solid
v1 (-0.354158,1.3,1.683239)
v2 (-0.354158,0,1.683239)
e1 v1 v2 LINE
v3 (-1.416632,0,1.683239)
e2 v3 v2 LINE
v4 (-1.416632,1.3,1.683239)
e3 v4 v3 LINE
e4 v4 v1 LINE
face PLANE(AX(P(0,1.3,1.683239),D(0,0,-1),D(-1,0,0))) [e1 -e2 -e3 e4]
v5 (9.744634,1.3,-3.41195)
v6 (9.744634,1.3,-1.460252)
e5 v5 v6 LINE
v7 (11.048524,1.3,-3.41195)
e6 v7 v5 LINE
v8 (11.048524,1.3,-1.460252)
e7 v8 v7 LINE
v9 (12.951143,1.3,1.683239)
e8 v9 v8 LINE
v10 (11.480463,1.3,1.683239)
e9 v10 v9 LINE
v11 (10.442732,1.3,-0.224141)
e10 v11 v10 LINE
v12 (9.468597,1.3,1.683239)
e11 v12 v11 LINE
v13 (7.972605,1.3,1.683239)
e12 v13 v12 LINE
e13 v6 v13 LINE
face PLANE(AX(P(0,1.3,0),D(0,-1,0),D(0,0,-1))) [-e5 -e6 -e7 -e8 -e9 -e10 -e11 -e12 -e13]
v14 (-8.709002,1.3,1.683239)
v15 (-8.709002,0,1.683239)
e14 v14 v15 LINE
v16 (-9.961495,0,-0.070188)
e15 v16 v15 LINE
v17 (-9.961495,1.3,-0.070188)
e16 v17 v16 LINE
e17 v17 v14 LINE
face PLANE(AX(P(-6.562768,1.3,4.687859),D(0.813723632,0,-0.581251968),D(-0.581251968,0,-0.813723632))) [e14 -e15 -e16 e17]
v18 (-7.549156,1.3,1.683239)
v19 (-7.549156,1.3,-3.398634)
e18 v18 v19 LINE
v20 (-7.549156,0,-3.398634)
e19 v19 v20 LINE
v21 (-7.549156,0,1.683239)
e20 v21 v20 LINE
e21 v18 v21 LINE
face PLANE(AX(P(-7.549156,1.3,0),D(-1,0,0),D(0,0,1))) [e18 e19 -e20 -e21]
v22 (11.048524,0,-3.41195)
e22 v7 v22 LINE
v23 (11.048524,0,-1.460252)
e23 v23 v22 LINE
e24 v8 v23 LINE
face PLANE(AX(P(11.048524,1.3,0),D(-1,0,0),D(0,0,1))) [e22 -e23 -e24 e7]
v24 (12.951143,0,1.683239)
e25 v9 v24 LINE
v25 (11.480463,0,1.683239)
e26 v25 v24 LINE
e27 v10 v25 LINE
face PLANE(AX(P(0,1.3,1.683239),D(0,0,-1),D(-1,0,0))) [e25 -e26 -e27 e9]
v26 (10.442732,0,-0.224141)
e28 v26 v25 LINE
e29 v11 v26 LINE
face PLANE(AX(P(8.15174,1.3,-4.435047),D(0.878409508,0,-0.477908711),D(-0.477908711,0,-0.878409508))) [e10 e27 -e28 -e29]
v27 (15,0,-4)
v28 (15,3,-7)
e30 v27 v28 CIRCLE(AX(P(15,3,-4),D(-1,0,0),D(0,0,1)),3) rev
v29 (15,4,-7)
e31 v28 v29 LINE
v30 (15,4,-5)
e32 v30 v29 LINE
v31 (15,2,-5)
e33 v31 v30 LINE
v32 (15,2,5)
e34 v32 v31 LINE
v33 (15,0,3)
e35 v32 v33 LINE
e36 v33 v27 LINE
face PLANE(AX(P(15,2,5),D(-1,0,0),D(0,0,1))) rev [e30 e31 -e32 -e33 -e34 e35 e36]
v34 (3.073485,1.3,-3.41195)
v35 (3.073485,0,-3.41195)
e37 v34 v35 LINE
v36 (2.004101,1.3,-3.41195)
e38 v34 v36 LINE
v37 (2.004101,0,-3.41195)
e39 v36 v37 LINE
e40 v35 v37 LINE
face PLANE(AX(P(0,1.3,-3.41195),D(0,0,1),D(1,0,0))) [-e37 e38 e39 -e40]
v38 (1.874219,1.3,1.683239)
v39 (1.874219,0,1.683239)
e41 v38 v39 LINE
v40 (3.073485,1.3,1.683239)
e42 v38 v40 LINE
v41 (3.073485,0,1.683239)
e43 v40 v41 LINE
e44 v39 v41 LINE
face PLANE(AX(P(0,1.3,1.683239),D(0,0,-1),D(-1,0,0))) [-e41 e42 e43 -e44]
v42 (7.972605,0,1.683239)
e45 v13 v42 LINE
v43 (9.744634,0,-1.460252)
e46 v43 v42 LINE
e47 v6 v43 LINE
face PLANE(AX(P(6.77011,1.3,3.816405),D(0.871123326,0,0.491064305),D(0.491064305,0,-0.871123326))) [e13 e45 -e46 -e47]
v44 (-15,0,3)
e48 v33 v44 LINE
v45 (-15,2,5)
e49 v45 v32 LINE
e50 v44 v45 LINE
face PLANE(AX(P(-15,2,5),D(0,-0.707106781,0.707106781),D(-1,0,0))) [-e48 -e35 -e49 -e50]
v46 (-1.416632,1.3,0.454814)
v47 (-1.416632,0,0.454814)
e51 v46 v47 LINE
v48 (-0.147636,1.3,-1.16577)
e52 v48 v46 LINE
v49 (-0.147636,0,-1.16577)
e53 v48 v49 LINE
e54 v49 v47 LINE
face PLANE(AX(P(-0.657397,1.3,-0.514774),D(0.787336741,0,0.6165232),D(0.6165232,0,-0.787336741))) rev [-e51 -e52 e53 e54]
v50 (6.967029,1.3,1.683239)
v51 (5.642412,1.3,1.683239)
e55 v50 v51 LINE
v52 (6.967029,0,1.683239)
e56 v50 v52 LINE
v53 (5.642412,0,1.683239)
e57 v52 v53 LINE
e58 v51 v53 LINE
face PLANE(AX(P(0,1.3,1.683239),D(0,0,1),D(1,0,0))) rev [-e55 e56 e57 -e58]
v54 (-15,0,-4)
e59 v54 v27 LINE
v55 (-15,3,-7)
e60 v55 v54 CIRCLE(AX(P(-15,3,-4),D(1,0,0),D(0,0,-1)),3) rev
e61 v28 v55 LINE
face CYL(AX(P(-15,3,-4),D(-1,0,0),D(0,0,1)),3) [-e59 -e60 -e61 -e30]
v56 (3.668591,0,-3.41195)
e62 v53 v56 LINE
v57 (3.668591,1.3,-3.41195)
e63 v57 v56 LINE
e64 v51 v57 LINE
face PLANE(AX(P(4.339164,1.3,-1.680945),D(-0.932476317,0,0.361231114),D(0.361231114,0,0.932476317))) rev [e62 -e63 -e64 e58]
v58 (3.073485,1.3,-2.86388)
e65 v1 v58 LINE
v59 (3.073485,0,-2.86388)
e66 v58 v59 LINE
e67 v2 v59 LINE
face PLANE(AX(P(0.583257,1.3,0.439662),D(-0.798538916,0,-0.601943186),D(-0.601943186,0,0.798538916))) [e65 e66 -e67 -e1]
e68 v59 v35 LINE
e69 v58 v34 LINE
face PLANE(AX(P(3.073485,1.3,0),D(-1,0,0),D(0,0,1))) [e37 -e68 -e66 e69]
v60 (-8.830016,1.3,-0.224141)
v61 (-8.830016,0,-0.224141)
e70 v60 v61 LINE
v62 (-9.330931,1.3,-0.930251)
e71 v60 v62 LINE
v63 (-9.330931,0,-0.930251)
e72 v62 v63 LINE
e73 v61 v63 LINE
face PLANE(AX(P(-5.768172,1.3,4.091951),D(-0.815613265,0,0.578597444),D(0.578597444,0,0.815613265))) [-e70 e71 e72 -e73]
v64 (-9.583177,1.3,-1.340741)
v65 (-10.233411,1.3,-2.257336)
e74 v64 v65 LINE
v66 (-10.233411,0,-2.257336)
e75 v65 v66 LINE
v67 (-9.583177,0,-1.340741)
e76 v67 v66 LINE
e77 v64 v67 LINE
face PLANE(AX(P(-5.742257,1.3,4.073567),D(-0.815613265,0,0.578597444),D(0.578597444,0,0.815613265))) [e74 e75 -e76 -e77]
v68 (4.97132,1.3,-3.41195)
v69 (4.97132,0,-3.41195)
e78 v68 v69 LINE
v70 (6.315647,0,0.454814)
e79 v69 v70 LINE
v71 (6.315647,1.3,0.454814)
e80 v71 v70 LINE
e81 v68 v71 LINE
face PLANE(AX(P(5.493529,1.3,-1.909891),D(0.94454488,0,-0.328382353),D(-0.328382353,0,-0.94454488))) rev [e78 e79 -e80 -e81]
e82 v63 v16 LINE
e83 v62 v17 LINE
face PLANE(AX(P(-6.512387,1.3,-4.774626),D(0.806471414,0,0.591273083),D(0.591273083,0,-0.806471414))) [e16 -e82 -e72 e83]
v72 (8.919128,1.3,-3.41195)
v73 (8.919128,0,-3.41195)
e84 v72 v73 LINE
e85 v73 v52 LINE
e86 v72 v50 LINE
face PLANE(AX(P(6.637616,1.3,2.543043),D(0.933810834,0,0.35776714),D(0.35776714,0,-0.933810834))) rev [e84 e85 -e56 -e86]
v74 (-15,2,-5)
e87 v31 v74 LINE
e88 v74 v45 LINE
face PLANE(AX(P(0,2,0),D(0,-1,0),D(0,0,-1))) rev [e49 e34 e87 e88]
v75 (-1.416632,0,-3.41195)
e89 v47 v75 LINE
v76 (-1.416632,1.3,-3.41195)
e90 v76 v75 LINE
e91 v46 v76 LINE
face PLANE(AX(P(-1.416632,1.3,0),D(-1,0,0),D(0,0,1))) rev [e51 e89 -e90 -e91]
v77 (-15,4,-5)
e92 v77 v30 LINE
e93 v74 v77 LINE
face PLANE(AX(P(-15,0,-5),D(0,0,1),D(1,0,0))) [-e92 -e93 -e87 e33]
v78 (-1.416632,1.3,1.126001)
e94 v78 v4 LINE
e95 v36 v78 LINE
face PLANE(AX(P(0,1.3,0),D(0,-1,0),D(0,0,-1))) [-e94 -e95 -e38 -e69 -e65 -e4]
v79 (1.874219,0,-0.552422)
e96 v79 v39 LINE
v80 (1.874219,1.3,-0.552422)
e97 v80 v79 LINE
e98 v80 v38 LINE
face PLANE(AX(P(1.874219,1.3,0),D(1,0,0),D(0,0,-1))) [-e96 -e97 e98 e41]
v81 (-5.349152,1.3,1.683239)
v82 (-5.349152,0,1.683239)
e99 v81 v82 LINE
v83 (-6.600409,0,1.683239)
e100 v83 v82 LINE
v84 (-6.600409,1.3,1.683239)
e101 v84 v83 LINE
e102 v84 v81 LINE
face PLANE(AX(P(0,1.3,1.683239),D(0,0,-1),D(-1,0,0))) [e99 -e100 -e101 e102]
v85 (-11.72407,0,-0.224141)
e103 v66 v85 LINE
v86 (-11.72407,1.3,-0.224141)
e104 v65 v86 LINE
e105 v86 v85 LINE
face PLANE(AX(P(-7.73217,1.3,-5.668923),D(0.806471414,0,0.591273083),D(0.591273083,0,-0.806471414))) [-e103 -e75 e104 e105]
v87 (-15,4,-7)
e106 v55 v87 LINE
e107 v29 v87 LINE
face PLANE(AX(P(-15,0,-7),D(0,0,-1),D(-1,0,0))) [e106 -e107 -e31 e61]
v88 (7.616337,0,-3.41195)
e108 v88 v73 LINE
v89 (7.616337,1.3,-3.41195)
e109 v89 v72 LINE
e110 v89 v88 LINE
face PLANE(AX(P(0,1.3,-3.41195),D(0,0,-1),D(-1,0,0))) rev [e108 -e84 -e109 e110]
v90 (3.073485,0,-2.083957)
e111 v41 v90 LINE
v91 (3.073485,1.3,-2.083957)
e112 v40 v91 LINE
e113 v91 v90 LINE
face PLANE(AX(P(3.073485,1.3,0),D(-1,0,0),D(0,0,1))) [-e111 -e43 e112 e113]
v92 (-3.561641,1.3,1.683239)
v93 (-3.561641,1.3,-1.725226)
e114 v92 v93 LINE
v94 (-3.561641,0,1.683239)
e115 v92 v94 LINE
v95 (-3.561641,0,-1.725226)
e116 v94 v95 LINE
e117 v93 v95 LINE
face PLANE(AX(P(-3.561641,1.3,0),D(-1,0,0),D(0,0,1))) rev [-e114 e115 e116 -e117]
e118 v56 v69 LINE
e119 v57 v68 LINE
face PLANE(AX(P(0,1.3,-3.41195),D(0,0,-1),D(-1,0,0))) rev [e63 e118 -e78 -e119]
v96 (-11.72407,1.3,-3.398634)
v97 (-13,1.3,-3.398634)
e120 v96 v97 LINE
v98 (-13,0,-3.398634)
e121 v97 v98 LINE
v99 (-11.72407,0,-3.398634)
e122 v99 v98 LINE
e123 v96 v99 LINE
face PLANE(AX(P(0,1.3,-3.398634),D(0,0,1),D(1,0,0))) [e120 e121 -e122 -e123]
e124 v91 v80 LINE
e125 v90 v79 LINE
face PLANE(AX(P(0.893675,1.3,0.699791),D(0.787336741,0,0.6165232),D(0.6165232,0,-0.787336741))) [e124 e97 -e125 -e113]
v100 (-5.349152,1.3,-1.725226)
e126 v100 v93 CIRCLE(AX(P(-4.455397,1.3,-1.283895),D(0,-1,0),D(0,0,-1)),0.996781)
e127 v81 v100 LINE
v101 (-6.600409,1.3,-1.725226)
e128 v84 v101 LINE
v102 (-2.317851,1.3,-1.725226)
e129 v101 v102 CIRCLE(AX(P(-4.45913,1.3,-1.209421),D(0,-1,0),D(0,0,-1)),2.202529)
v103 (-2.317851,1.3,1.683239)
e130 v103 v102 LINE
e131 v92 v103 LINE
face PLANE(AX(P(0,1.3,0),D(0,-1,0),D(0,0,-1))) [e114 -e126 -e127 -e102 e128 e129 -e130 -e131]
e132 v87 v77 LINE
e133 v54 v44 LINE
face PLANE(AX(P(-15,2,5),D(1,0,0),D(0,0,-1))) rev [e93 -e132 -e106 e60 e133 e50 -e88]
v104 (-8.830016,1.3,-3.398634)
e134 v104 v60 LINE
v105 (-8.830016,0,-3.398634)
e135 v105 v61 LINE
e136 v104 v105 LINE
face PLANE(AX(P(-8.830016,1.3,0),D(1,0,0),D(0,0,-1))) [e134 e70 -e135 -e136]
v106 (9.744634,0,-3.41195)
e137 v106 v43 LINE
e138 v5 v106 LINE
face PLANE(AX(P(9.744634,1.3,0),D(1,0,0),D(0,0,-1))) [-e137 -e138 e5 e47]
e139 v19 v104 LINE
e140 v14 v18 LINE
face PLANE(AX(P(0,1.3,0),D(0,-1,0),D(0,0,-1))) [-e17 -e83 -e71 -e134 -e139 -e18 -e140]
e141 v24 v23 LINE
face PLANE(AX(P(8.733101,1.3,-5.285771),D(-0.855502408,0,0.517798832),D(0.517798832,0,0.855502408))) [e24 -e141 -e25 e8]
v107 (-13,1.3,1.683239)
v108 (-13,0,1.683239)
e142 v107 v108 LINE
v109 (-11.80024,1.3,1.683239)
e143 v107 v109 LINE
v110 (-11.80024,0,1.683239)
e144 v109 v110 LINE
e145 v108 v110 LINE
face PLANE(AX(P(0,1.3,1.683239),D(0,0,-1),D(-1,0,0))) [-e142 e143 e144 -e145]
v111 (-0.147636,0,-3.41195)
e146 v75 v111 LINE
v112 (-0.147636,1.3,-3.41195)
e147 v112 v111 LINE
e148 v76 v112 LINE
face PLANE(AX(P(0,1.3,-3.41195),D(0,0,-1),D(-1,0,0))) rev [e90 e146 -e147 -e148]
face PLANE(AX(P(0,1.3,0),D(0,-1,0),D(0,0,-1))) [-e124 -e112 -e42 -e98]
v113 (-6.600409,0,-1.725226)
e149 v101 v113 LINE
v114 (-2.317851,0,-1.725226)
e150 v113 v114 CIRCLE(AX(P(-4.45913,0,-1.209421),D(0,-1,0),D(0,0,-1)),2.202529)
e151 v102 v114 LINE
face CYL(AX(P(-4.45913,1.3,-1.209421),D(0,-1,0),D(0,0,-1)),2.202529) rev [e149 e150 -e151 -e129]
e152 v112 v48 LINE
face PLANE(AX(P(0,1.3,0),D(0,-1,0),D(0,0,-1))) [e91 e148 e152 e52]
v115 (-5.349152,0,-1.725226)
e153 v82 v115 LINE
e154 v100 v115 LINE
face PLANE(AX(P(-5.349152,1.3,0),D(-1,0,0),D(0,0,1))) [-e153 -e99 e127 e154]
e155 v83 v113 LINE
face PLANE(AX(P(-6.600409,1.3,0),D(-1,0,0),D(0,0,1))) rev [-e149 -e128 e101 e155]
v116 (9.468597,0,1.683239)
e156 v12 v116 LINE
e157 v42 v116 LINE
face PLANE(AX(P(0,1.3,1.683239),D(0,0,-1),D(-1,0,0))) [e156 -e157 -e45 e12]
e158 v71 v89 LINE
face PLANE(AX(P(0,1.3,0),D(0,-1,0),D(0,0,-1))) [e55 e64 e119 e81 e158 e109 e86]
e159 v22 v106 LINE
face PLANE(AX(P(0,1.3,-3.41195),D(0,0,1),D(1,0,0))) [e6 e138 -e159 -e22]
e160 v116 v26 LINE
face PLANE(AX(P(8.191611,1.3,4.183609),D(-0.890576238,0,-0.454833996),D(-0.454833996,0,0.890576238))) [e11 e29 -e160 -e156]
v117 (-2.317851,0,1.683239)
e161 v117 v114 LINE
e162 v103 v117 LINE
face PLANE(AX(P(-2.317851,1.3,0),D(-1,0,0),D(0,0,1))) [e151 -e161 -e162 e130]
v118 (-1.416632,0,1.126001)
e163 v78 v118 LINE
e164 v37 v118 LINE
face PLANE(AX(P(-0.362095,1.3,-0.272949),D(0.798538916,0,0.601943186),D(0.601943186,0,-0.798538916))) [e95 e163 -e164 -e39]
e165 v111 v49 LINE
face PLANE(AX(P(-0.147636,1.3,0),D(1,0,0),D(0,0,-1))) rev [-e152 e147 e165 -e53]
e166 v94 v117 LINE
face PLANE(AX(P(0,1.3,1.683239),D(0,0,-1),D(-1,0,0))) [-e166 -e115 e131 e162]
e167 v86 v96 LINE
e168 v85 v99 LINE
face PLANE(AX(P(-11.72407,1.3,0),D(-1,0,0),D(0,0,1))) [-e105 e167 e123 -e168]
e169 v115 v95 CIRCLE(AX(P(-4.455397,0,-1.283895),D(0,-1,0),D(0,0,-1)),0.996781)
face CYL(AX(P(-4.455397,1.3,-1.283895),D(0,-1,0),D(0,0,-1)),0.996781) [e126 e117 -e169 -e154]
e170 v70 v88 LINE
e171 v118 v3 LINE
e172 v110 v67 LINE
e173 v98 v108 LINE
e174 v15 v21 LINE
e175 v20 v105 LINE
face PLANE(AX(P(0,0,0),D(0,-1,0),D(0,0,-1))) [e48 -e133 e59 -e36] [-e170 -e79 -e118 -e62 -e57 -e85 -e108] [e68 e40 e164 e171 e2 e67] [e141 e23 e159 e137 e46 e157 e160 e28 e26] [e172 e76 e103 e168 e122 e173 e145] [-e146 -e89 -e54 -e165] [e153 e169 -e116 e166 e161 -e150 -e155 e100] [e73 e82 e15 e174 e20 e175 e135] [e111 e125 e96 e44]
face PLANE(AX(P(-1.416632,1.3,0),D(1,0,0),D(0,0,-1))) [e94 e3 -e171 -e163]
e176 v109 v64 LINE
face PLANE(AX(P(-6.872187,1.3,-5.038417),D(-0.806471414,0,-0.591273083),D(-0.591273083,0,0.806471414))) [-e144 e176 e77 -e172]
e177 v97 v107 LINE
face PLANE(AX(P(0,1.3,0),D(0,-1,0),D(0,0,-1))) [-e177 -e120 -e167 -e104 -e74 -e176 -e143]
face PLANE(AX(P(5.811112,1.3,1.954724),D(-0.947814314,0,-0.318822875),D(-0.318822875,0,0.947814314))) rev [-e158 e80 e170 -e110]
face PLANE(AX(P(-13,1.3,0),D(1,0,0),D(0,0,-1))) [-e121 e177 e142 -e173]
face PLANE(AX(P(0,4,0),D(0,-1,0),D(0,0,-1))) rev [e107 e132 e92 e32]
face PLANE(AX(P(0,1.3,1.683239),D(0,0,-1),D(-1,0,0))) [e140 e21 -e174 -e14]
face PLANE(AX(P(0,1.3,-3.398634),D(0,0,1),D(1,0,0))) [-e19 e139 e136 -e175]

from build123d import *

# Parameters (mm, degrees)
CROQUIS1_W                   = 30
CROQUIS1_H                   = 10
SALIENTE_EXTRUIR1_DEPTH      = 2
SALIENTE_EXTRUIR2_DEPTH      = 2
SALIENTE_EXTRUIR2_DEPTH_BACK = 2
CROQUIS2_W                   = 30
CROQUIS2_H                   = 2
CHAFL_N1_SIZE                = 2
REDONDEO1_R                  = 3
CORTAR_EXTRUIR1_DEPTH        = 1.3


with BuildPart() as part:
    # Croquis1 → Saliente-Extruir1 (new body)
    with BuildSketch(Plane(origin=(0, 0, 0), x_dir=(1, 0, 0), z_dir=(0, 1, 0))):
        Rectangle(CROQUIS1_W, CROQUIS1_H)
    extrude(amount=SALIENTE_EXTRUIR1_DEPTH)

    # Croquis2 → Saliente-Extruir2 (add, two sides: drawn at the far end of the back side and taken through both)
    with BuildSketch(Plane(origin=(0, 2, 0), x_dir=(1, 0, 0), z_dir=(0, 1, 0)).offset(-SALIENTE_EXTRUIR2_DEPTH_BACK)):
        with Locations((0, 6)):
            Rectangle(CROQUIS2_W, CROQUIS2_H)
    extrude(amount=SALIENTE_EXTRUIR2_DEPTH + SALIENTE_EXTRUIR2_DEPTH_BACK)

    # Chaflán1
    chafl_n1_edges = [part.edges().sort_by_distance(p)[0] for p in [
        (0, 0, 5),
    ]]
    chamfer(chafl_n1_edges, length=CHAFL_N1_SIZE - 0.0001)  # a hair under: the kernel refuses the full size

    # Redondeo1
    redondeo1_edges = [part.edges().sort_by_distance(p)[0] for p in [
        (0, 0, -7),
    ]]
    fillet(redondeo1_edges, radius=REDONDEO1_R)

    # Croquis3 → Cortar-Extruir1 (cut)
    with BuildSketch(Plane.XZ):
        Polygon((-9.961494987, -0.07018817), (-8.709002423, 1.683238665), (-7.549155707, 1.683238665), (-7.549155707, -3.398633507), (-8.83001578, -3.398633507), (-8.83001578, -0.22414092), (-9.330931139, -0.930250522), align=None)
        Polygon((-11.80023979, 1.683238665), (-13, 1.683238665), (-13, -3.398633507), (-11.724069575, -3.398633507), (-11.724069575, -0.22414092), (-10.233410768, -2.257336324), (-9.583176724, -1.340741346), align=None)
        with BuildLine():
            Line((-6.600409237, 1.683238665), (-6.600409237, -1.725226293))
            ThreePointArc((-6.600409237, -1.725226293), (-4.45912989, -3.411949657), (-2.317850543, -1.725226293))
            Line((-2.317850543, -1.725226293), (-2.317850543, 1.683238665))
            Line((-2.317850543, 1.683238665), (-3.56164133, 1.683238665))
            Line((-3.56164133, 1.683238665), (-3.56164133, -1.725226293))
            ThreePointArc((-3.56164133, -1.725226293), (-4.455396596, -2.280675862), (-5.349151863, -1.725226293))
            Line((-5.349151863, -1.725226293), (-5.349151863, 1.683238665))
            Line((-5.349151863, 1.683238665), (-6.600409237, 1.683238665))
        make_face()
        Polygon((-0.147635828, -1.165769584), (-1.416632441, 0.454814455), (-1.416632441, -3.411949657), (-0.147635828, -3.411949657), align=None)
        Polygon((-1.416632441, 1.126001398), (-1.416632441, 1.683238665), (-0.354158469, 1.683238665), (3.073485226, -2.863879645), (3.073485226, -3.411949657), (2.004100926, -3.411949657), align=None)
        Polygon((1.874218963, -0.552422461), (1.874218963, 1.683238665), (3.073485226, 1.683238665), (3.073485226, -2.083956703), align=None)
        Polygon((6.967028865, 1.683238665), (5.642411569, 1.683238665), (3.668591411, -3.411949657), (4.971319865, -3.411949657), (6.315646772, 0.454814455), (7.616337035, -3.411949657), (8.919127609, -3.411949657), align=None)
        Polygon((9.744634122, -1.460252001), (7.972604821, 1.683238665), (9.46859716, 1.683238665), (10.442731706, -0.22414092), (11.480463321, 1.683238665), (12.951143356, 1.683238665), (11.048523586, -1.460252001), (11.048523586, -3.411949657), (9.744634122, -3.411949657), align=None)
    extrude(amount=-CORTAR_EXTRUIR1_DEPTH, mode=Mode.SUBTRACT)


solid = part.part
